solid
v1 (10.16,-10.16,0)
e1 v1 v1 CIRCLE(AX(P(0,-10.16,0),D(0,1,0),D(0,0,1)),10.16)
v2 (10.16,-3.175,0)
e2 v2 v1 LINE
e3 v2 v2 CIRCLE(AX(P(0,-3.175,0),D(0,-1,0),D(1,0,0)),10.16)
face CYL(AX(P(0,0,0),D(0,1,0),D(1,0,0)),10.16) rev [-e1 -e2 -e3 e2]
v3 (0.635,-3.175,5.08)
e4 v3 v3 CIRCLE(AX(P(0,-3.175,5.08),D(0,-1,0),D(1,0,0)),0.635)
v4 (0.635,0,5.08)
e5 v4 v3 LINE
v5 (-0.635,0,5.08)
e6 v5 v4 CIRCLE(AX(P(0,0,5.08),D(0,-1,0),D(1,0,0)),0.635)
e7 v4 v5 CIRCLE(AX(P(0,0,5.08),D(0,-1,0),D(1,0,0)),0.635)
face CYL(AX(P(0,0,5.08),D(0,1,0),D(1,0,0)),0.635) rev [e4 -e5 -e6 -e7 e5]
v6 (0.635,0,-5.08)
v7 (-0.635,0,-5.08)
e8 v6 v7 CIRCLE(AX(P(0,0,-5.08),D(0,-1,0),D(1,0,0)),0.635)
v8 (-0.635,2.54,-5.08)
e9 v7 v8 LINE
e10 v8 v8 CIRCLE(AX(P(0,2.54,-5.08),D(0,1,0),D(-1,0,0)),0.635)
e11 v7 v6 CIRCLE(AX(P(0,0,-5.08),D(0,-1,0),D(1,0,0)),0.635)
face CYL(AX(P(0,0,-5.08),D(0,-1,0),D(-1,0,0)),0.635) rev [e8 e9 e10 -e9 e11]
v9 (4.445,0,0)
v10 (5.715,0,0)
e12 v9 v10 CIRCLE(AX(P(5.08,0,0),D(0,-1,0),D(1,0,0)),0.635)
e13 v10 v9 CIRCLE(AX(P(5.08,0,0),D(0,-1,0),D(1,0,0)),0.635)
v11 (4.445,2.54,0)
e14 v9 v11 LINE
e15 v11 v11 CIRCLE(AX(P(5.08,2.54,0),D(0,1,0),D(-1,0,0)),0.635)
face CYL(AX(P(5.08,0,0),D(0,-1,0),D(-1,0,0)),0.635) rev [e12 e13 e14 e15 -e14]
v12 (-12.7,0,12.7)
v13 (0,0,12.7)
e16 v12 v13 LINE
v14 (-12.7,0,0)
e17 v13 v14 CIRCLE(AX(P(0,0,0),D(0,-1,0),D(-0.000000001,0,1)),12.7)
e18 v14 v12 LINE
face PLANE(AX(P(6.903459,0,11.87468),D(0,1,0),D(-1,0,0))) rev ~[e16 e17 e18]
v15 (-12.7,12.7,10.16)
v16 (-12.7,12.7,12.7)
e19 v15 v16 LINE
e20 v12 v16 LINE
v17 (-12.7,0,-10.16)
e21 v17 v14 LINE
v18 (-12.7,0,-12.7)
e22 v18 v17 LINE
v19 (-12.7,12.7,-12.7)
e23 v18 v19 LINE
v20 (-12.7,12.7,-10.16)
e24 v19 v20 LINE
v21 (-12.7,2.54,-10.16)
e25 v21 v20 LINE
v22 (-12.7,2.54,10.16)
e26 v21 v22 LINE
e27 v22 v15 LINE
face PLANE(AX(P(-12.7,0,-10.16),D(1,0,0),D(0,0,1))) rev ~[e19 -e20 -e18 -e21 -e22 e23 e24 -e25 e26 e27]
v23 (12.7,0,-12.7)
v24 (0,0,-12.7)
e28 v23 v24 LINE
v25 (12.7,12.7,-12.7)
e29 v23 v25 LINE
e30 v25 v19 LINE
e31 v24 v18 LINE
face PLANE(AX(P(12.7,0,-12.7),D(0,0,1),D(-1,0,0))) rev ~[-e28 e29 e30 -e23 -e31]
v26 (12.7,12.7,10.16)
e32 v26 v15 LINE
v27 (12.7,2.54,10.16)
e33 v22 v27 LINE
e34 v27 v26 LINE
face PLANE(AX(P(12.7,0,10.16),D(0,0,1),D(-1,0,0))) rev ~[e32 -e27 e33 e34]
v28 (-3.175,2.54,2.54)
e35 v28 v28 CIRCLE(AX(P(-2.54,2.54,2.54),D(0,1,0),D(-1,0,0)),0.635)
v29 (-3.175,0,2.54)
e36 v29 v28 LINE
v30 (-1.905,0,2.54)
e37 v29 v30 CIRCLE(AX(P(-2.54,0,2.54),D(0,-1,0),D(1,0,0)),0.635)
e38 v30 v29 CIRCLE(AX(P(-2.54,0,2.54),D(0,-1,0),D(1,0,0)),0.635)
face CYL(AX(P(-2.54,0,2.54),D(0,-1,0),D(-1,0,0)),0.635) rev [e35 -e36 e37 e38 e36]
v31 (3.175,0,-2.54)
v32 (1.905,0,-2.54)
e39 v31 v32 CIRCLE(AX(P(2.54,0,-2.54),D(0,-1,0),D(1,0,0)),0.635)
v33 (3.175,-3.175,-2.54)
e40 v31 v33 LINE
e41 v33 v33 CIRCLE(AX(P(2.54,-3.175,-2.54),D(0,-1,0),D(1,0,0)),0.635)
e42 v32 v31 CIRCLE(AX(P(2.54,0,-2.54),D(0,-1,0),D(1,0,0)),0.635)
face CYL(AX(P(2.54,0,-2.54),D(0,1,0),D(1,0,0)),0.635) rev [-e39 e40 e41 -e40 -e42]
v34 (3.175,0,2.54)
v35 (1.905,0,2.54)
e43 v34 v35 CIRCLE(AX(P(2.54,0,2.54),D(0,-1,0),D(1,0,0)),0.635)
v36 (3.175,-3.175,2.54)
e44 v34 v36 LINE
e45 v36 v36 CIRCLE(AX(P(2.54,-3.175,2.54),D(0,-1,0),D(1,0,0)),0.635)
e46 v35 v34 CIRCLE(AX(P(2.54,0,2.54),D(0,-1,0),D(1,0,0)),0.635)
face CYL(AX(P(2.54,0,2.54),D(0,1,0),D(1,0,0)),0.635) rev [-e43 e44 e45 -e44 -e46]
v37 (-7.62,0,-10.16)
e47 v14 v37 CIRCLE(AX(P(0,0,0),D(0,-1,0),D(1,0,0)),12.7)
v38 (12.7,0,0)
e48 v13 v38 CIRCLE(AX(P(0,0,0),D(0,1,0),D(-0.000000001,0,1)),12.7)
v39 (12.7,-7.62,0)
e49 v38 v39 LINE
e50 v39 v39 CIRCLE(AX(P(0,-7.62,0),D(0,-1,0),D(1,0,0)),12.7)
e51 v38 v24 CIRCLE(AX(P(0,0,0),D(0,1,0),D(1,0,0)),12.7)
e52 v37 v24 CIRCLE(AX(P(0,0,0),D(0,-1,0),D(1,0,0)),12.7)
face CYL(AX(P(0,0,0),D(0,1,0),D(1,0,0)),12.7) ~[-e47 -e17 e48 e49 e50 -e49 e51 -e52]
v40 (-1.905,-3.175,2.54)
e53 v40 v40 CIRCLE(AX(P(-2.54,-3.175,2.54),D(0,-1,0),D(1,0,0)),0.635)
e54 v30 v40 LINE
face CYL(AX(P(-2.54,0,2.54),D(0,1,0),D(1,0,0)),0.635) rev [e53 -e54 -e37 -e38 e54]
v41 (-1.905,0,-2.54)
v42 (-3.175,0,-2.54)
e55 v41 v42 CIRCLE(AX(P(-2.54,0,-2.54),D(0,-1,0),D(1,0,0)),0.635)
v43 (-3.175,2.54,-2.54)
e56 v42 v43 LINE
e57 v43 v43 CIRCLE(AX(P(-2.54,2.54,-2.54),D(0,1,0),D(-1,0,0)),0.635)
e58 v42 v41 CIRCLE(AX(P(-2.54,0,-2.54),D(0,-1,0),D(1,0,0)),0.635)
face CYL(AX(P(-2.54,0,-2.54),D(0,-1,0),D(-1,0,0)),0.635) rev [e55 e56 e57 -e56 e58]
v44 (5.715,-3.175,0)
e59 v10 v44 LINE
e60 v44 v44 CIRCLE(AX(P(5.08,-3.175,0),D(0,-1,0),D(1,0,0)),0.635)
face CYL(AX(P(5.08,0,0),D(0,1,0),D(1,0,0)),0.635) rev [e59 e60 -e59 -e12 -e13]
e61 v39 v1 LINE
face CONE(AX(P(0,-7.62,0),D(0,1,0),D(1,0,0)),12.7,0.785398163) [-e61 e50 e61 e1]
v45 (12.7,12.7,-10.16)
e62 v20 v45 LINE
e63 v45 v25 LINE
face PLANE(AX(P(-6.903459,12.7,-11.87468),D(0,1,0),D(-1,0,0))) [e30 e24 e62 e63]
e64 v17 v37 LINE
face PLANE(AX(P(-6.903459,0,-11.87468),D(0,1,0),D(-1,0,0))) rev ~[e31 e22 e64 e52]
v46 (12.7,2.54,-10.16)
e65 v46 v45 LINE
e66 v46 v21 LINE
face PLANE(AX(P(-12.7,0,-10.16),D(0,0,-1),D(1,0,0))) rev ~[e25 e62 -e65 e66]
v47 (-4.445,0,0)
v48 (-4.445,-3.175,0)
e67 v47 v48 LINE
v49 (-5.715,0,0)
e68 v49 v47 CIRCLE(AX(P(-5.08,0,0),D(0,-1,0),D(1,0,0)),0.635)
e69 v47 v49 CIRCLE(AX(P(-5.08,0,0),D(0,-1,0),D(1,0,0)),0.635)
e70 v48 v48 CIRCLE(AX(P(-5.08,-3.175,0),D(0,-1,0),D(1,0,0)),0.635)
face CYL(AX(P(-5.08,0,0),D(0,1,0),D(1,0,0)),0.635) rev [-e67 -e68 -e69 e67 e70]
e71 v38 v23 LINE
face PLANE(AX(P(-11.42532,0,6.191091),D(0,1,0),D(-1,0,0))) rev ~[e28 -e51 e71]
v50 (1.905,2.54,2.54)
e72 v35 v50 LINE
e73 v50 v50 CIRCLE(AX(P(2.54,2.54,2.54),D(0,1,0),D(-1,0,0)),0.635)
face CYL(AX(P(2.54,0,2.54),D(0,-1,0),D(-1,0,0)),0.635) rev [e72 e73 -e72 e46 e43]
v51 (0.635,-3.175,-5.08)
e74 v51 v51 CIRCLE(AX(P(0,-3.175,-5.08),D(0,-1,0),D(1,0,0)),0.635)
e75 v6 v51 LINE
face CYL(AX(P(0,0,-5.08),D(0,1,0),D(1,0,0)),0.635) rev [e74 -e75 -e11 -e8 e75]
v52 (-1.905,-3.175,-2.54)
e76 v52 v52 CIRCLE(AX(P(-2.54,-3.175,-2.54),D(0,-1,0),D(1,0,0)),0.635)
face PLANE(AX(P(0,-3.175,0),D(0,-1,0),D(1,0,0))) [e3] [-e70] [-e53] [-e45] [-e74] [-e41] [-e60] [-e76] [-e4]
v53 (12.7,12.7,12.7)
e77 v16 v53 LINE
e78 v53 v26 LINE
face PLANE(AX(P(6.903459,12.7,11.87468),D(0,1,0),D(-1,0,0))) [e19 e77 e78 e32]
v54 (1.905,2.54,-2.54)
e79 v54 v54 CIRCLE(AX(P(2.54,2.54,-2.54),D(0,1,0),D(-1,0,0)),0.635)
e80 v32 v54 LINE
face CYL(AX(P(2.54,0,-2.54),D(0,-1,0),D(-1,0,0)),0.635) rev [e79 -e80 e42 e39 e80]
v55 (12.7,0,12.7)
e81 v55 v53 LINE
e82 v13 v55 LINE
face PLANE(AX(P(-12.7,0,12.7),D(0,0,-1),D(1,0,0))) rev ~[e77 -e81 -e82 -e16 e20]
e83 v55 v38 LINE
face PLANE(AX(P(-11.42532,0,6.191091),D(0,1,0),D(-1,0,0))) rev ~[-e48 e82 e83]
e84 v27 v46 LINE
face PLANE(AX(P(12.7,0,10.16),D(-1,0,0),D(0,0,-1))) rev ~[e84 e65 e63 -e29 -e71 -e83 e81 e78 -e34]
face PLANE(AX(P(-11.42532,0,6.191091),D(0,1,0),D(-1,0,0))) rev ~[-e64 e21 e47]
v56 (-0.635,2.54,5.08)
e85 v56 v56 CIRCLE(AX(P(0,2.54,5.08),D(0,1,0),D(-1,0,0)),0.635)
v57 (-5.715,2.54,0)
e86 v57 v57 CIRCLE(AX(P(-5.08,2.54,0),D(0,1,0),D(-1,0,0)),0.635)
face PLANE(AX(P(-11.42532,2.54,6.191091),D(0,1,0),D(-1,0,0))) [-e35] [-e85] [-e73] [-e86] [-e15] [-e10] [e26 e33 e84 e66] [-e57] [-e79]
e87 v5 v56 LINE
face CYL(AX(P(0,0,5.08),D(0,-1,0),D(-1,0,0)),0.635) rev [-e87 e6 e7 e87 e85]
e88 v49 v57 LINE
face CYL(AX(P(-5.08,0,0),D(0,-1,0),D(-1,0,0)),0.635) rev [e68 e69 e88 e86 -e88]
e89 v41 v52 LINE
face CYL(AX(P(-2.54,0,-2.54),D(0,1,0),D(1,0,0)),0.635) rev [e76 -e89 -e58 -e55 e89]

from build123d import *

# Parameters (mm, degrees)
F0_R     = 12.7
F0_R_2   = 10.16
F1_DEPTH = 12.7
F0_R_3   = 0.635
F2_DEPTH = 3.175
F4_DEPTH = 12.7
F3_R     = 0.635
F5_DEPTH = 2.54


# Not quite as in the source:
# - a fillet or chamfer that OpenCascade refuses, or shapes differently, is made with other operations: its cross-section is extruded or revolved along the edge and cut away or added


with BuildPart() as f1:
    # F0 (on Front) → F1 (new body)
    with BuildSketch(Plane.XZ):
        Circle(F0_R)
        Circle(F0_R_2, mode=Mode.SUBTRACT)
    extrude(amount=F1_DEPTH)

    # F0 (on Front) → F2 (join)
    with BuildSketch(Plane.XZ):
        Circle(F0_R_2)
        with Locations((0, -5.08)):
            Circle(F0_R_3, mode=Mode.SUBTRACT)
        with Locations((-5.08, 0)):
            Circle(F0_R_3, mode=Mode.SUBTRACT)
        with Locations((-2.54, -2.54)):
            Circle(F0_R_3, mode=Mode.SUBTRACT)
        with Locations((2.54, -2.54)):
            Circle(F0_R_3, mode=Mode.SUBTRACT)
        with Locations((5.08, 0)):
            Circle(F0_R_3, mode=Mode.SUBTRACT)
        with Locations((-2.54, 2.54)):
            Circle(F0_R_3, mode=Mode.SUBTRACT)
        with Locations((0, 5.08)):
            Circle(F0_R_3, mode=Mode.SUBTRACT)
        with Locations((2.54, 2.54)):
            Circle(F0_R_3, mode=Mode.SUBTRACT)
    extrude(amount=F2_DEPTH)

    # F3 (on face) → F4 (join)
    with BuildSketch(Plane(origin=(0, 0, 0), x_dir=(-1, 0, 0), z_dir=(0, 1, 0))):
        with BuildLine():
            ThreePointArc((-7.62, 10.16), (-4.0160926196, 12.0482778882), (1.86e-08, 12.7))
            Line((1.86e-08, 12.7), (-12.7, 12.7))
            Line((-12.7, 12.7), (-12.7, 10.16))
            Line((-12.7, 10.16), (-7.62, 10.16))
        make_face()
        with BuildLine():
            ThreePointArc((7.62, 10.16), (4.0160926372, 12.0482778823), (1.86e-08, 12.7))
            ThreePointArc((1.86e-08, 12.7), (-4.0160926196, 12.0482778882), (-7.62, 10.16))
            Line((-7.62, 10.16), (7.62, 10.16))
        make_face()
        with BuildLine():
            Line((12.7, 10.16), (12.7, 12.7))
            Line((12.7, 12.7), (1.86e-08, 12.7))
            ThreePointArc((1.86e-08, 12.7), (4.0160926372, 12.0482778823), (7.62, 10.16))
            Line((7.62, 10.16), (12.7, 10.16))
        make_face()
        with BuildLine():
            Line((12.7, -12.7), (12.7, -10.16))
            Line((12.7, -10.16), (7.62, -10.16))
            ThreePointArc((7.62, -10.16), (4.0160926284, -12.0482778852), (0, -12.7))
            Line((0, -12.7), (12.7, -12.7))
        make_face()
        with BuildLine():
            ThreePointArc((0, -12.7), (4.0160926284, -12.0482778852), (7.62, -10.16))
            Line((7.62, -10.16), (-7.62, -10.16))
            ThreePointArc((-7.62, -10.16), (-4.0160926284, -12.0482778852), (0, -12.7))
        make_face()
        with BuildLine():
            Line((-7.62, -10.16), (-12.7, -10.16))
            Line((-12.7, -10.16), (-12.7, -12.7))
            Line((-12.7, -12.7), (0, -12.7))
            ThreePointArc((0, -12.7), (-4.0160926284, -12.0482778852), (-7.62, -10.16))
        make_face()
    extrude(amount=F4_DEPTH)

    # F3 (on face) → F5 (join)
    with BuildSketch(Plane(origin=(0, 0, 0), x_dir=(-1, 0, 0), z_dir=(0, 1, 0))):
        with BuildLine():
            Line((12.7, 0), (12.7, 10.16))
            Line((12.7, 10.16), (7.62, 10.16))
            ThreePointArc((7.62, 10.16), (11.3592253257, 5.6796126628), (12.7, 0))
        make_face()
        with BuildLine():
            ThreePointArc((12.7, 0), (11.3592253257, 5.6796126628), (7.62, 10.16))
            Line((7.62, 10.16), (-7.62, 10.16))
            ThreePointArc((-7.62, 10.16), (-11.3592253257, 5.6796126628), (-12.7, 0))
            ThreePointArc((-12.7, 0), (-11.3592253257, -5.6796126628), (-7.62, -10.16))
            Line((-7.62, -10.16), (7.62, -10.16))
            ThreePointArc((7.62, -10.16), (11.3592253257, -5.6796126628), (12.7, 0))
        make_face()
        with Locations((0, -5.08)):
            Circle(F3_R, mode=Mode.SUBTRACT)
        with Locations((-5.08, 0)):
            Circle(F3_R, mode=Mode.SUBTRACT)
        with Locations((-2.54, -2.54)):
            Circle(F3_R, mode=Mode.SUBTRACT)
        with Locations((2.54, -2.54)):
            Circle(F3_R, mode=Mode.SUBTRACT)
        with Locations((5.08, 0)):
            Circle(F3_R, mode=Mode.SUBTRACT)
        with Locations((-2.54, 2.54)):
            Circle(F3_R, mode=Mode.SUBTRACT)
        with Locations((0, 5.08)):
            Circle(F3_R, mode=Mode.SUBTRACT)
        with Locations((2.54, 2.54)):
            Circle(F3_R, mode=Mode.SUBTRACT)
        with BuildLine():
            ThreePointArc((-12.7, 0), (-11.3592253257, 5.6796126628), (-7.62, 10.16))
            Line((-7.62, 10.16), (-12.7, 10.16))
            Line((-12.7, 10.16), (-12.7, 0))
        make_face()
        with BuildLine():
            Line((12.7, -10.16), (12.7, 0))
            ThreePointArc((12.7, 0), (11.3592253257, -5.6796126628), (7.62, -10.16))
            Line((7.62, -10.16), (12.7, -10.16))
        make_face()
        with BuildLine():
            ThreePointArc((-7.62, -10.16), (-11.3592253257, -5.6796126628), (-12.7, 0))
            Line((-12.7, 0), (-12.7, -10.16))
            Line((-12.7, -10.16), (-7.62, -10.16))
        make_face()
    extrude(amount=F5_DEPTH)

    # F6: chamfer of 5.08 on 1 edges, made by hand

    # F6_s1 → F6_t2 (revolve, cut)
    with BuildSketch(Plane.XY):
        Polygon((12.7, -7.62), (7.62, -12.7), (12.7, -12.7), align=None)
    revolve(axis=Axis((0, -12.7, 0), (0, -1, 0)), mode=Mode.SUBTRACT)


solid = f1.part
